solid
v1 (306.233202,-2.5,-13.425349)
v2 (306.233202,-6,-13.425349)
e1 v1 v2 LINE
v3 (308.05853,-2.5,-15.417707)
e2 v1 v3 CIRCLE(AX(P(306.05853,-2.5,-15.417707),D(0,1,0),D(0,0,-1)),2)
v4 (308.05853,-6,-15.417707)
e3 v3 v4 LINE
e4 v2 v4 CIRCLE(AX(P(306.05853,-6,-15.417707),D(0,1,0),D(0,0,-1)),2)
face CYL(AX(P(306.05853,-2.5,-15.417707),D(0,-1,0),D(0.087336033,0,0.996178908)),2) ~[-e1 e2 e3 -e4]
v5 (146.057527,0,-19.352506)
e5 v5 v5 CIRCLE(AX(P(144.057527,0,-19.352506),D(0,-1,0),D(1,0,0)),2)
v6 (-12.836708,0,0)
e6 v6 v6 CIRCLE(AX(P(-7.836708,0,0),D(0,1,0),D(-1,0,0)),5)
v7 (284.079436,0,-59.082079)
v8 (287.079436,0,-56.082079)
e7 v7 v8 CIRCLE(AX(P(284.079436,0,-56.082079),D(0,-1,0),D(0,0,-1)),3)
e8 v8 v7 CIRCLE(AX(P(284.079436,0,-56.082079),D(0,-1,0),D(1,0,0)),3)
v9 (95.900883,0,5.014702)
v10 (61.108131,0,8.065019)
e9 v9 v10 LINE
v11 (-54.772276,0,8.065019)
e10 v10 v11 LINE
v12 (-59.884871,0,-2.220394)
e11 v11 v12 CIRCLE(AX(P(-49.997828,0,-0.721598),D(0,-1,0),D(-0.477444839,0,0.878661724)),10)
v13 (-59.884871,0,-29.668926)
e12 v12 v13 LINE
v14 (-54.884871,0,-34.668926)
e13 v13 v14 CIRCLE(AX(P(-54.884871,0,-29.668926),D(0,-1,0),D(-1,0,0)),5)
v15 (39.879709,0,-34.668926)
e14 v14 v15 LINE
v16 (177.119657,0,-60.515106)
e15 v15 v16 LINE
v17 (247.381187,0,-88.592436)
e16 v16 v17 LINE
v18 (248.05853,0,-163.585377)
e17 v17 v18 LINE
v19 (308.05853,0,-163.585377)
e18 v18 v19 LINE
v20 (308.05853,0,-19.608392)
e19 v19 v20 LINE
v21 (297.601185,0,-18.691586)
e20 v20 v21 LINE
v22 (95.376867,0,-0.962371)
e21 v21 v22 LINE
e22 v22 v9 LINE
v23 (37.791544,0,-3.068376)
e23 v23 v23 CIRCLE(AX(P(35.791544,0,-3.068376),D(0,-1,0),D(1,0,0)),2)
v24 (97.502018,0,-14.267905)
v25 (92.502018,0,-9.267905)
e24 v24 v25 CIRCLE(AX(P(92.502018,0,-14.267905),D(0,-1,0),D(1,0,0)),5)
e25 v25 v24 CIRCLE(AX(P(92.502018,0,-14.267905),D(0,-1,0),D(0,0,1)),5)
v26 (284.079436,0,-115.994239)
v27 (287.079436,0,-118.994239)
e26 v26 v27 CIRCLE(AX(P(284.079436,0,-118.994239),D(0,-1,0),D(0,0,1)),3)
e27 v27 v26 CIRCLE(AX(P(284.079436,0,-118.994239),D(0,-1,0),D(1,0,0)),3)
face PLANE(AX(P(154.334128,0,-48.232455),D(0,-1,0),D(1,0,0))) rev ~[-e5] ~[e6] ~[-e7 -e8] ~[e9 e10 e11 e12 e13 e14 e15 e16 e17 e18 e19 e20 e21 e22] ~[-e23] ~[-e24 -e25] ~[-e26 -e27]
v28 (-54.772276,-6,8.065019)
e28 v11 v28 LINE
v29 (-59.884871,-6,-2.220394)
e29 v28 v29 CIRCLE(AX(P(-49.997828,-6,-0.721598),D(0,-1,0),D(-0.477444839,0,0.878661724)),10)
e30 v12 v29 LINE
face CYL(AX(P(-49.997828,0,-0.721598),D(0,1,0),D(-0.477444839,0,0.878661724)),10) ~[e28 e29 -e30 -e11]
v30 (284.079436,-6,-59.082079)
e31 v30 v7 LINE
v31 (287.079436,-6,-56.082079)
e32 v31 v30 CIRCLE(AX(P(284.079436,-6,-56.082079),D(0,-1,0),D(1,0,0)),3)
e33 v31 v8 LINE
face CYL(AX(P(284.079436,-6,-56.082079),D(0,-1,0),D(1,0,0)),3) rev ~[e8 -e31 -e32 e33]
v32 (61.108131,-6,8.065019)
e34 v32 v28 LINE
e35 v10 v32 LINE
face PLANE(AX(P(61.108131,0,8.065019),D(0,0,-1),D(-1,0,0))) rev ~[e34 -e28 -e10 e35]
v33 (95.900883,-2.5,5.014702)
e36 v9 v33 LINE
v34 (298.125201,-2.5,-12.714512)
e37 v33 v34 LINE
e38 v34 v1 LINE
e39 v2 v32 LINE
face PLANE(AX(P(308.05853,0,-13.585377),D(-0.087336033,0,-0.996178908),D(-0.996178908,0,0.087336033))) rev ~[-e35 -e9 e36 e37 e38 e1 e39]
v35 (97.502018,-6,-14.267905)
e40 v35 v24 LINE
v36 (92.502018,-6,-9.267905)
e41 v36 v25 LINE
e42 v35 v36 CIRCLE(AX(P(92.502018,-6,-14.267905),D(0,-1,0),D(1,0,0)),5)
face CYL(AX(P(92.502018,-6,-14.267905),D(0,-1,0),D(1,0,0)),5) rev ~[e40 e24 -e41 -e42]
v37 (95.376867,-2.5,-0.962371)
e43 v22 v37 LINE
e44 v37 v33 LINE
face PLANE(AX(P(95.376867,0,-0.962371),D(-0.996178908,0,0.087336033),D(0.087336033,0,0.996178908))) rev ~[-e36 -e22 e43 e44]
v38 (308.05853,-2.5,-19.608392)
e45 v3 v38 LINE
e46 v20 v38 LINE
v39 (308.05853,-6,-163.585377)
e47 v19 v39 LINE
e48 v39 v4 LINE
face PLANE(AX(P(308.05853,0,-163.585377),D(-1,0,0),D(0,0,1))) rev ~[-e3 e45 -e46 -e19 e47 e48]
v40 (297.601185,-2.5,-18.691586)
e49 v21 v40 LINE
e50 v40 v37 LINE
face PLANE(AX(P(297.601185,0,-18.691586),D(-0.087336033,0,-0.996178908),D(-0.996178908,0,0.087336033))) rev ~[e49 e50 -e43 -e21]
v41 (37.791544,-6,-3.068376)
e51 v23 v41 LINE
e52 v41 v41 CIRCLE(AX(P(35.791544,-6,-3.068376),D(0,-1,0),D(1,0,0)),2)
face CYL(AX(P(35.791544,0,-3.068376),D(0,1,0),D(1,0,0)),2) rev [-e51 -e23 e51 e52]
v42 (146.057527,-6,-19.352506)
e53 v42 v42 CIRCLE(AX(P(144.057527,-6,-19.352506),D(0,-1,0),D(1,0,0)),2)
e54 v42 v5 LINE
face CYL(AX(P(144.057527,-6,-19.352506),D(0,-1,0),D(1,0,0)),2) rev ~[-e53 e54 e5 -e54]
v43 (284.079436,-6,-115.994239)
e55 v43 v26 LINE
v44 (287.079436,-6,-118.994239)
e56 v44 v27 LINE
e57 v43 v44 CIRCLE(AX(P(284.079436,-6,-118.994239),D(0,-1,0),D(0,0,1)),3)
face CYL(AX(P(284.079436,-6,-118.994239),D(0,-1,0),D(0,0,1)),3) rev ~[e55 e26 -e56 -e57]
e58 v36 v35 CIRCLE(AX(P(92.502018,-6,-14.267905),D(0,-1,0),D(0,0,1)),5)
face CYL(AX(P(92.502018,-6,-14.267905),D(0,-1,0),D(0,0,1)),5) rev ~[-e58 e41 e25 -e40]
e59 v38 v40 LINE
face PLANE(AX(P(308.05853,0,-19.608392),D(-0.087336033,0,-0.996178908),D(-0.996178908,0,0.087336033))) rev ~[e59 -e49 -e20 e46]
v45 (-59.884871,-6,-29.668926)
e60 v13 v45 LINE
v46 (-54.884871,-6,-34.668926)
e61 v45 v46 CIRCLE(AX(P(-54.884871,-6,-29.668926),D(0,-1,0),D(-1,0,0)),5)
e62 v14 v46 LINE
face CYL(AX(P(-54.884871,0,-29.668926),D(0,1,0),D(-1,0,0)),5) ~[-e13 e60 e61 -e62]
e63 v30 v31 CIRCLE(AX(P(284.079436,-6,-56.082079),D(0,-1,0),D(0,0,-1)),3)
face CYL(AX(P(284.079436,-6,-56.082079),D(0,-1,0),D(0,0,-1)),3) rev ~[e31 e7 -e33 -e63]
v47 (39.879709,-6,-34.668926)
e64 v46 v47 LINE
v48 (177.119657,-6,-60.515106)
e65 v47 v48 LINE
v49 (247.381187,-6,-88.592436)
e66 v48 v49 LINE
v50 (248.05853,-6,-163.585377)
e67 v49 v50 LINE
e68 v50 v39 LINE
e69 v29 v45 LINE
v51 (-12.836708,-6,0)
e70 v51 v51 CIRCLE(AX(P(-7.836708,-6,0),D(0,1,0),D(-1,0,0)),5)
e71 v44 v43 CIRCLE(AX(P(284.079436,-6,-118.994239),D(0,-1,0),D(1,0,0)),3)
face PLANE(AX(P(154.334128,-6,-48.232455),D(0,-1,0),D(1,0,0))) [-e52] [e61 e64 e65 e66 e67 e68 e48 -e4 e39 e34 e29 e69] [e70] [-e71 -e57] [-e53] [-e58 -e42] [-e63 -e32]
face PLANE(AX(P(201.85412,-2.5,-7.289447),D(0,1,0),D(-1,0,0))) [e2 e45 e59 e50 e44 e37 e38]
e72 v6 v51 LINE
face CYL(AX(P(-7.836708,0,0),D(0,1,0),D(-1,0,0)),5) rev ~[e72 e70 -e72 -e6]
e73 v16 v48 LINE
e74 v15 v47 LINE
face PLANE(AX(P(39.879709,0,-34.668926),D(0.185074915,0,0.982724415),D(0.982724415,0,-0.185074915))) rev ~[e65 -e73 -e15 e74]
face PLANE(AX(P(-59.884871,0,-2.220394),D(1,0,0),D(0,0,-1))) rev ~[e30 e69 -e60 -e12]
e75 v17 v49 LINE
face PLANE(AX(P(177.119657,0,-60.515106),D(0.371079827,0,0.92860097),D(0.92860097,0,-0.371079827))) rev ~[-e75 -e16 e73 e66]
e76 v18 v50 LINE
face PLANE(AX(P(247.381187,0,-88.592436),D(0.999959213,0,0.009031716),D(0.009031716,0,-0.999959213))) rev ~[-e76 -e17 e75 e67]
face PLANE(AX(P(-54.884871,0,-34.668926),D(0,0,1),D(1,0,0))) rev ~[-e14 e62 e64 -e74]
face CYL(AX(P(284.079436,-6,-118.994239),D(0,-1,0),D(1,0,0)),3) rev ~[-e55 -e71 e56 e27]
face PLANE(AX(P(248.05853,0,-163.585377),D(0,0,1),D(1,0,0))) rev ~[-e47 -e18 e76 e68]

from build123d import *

# Parameters (mm, degrees)
F0_R      = 2
F1_DEPTH  = 6
F3_DEPTH  = 6.001
F5_DEPTH  = 6.001
F6_R      = 5
F7_DEPTH  = 6.001
F8_DEPTH  = 585
F9_R      = 2
F10_DEPTH = 6.001
F12_DEPTH = 2.5
F13_R     = 2


# Not quite as in the source:
# - an extrude ends at something that could not be found from the text; its depth is read off the source's solid


with BuildPart() as f1:
    # F0 (on Front) → F1 (new body)
    with BuildSketch(Plane.XZ):
        with BuildLine():
            Line((61.1081310213, 8.0650188029), (-54.7722764313, 8.0650188029))
            ThreePointArc((-54.7722764313, 8.0650188029), (-58.9525619371, 3.7295520634), (-59.8848706484, -2.2203940898))
            Line((-59.8848706484, -2.2203940898), (-59.8848706484, -29.6689261496))
            ThreePointArc((-59.8848706484, -29.6689261496), (-58.4204045543, -33.2044600555), (-54.8848706484, -34.6689261496))
            Line((-54.8848706484, -34.6689261496), (-38.6363018323, -34.6689261496))
            Line((-38.6363018323, -34.6689261496), (39.8797094822, -34.6689261496))
            Line((39.8797094822, -34.6689261496), (177.1196573973, -60.5151057243))
            Line((177.1196573973, -60.5151057243), (247.381187493, -88.5924363301))
            Line((247.381187493, -88.5924363301), (248.0585300922, -163.5853774846))
            Line((248.0585300922, -163.5853774846), (308.0585300922, -163.5853774846))
            Line((308.0585300922, -163.5853774846), (308.0585300922, -13.5853774846))
            Line((308.0585300922, -13.5853774846), (61.1081310213, 8.0650188029))
        make_face()
        with Locations((35.7915443742, -3.0683759738)):
            Circle(F0_R, mode=Mode.SUBTRACT)
    extrude(amount=F1_DEPTH)

    # F2 (on face) → F3 (cut, through all)
    with BuildSketch(Plane.XZ.offset(6)):
        with BuildLine():
            ThreePointArc((92.5020176823, -9.2679053605), (88.9664837764, -17.8034392664), (97.5020176823, -14.2679053605))
            ThreePointArc((97.5020176823, -14.2679053605), (96.0375515883, -10.7323714546), (92.5020176823, -9.2679053605))
        make_face()
    extrude(amount=-F3_DEPTH, mode=Mode.SUBTRACT)

    # F4 (on face) → F5 (cut, through all)
    with BuildSketch(Plane.XZ.offset(6)):
        with BuildLine():
            ThreePointArc((284.0794362254, -115.9942394993), (281.9581158818, -121.1155598429), (287.0794362254, -118.9942394993))
            ThreePointArc((287.0794362254, -118.9942394993), (286.2007565689, -116.8729191558), (284.0794362254, -115.9942394993))
        make_face()
        with BuildLine():
            ThreePointArc((287.0794362254, -56.0820794532), (281.9581158818, -53.9607591097), (284.0794362254, -59.0820794532))
            ThreePointArc((284.0794362254, -59.0820794532), (286.2007565689, -58.2033997968), (287.0794362254, -56.0820794532))
        make_face()
    extrude(amount=-F5_DEPTH, mode=Mode.SUBTRACT)

    # F6 (on face) → F7 (cut, through all)
    with BuildSketch(Plane(origin=(0, 0, 0), x_dir=(-1, 0, 0), z_dir=(0, 1, 0))):
        with Locations((7.8367077125, 0)):
            Circle(F6_R)
    extrude(amount=-F7_DEPTH, mode=Mode.SUBTRACT)

    # F0 (on Front) → F8 (cut, through all)
    with BuildSketch(Plane.XZ):
        with BuildLine():
            Line((61.1081310213, 8.0650188029), (-54.7722764313, 8.0650188029))
            ThreePointArc((-54.7722764313, 8.0650188029), (-58.9525619371, 3.7295520634), (-59.8848706484, -2.2203940898))
            Line((-59.8848706484, -2.2203940898), (-59.8848706484, -29.6689261496))
            ThreePointArc((-59.8848706484, -29.6689261496), (-58.4204045543, -33.2044600555), (-54.8848706484, -34.6689261496))
            Line((-54.8848706484, -34.6689261496), (-38.6363018323, -34.6689261496))
            Line((-38.6363018323, -34.6689261496), (39.8797094822, -34.6689261496))
            Line((39.8797094822, -34.6689261496), (177.1196573973, -60.5151057243))
            Line((177.1196573973, -60.5151057243), (247.381187493, -88.5924363301))
            Line((247.381187493, -88.5924363301), (248.0585300922, -163.5853774846))
            Line((248.0585300922, -163.5853774846), (308.0585300922, -163.5853774846))
            Line((308.0585300922, -163.5853774846), (308.0585300922, -13.5853774846))
            Line((308.0585300922, -13.5853774846), (61.1081310213, 8.0650188029))
        make_face()
        with Locations((35.7915443742, -3.0683759738)):
            Circle(F0_R, mode=Mode.SUBTRACT)
    extrude(amount=-F8_DEPTH, mode=Mode.SUBTRACT)

    # F9 (on face) → F10 (cut, through all)
    with BuildSketch(Plane.XZ.offset(6)):
        with Locations((144.0575271969, -19.352506299)):
            Circle(F9_R)
    extrude(amount=-F10_DEPTH, mode=Mode.SUBTRACT)

    # F11 (on face) → F12 (cut)
    with BuildSketch(Plane(origin=(0, 0, 0), x_dir=(-1, 0, 0), z_dir=(0, 1, 0))):
        Polygon((-95.3768665934, -0.9623710934), (-95.9008827898, 5.0147023565), (-298.1252011792, -12.7145122896), (-308.0585300922, -13.5853774846), (-308.0585300922, -19.6083919751), (-297.6011849827, -18.6915857396), align=None)
    extrude(amount=-F12_DEPTH, mode=Mode.SUBTRACT)

    # F13
    f13_edges = [f1.edges().sort_by_distance(p)[0] for p in [
        (308.05853, -4.25, -13.585377),
    ]]
    fillet(f13_edges, radius=F13_R)


solid = f1.part
